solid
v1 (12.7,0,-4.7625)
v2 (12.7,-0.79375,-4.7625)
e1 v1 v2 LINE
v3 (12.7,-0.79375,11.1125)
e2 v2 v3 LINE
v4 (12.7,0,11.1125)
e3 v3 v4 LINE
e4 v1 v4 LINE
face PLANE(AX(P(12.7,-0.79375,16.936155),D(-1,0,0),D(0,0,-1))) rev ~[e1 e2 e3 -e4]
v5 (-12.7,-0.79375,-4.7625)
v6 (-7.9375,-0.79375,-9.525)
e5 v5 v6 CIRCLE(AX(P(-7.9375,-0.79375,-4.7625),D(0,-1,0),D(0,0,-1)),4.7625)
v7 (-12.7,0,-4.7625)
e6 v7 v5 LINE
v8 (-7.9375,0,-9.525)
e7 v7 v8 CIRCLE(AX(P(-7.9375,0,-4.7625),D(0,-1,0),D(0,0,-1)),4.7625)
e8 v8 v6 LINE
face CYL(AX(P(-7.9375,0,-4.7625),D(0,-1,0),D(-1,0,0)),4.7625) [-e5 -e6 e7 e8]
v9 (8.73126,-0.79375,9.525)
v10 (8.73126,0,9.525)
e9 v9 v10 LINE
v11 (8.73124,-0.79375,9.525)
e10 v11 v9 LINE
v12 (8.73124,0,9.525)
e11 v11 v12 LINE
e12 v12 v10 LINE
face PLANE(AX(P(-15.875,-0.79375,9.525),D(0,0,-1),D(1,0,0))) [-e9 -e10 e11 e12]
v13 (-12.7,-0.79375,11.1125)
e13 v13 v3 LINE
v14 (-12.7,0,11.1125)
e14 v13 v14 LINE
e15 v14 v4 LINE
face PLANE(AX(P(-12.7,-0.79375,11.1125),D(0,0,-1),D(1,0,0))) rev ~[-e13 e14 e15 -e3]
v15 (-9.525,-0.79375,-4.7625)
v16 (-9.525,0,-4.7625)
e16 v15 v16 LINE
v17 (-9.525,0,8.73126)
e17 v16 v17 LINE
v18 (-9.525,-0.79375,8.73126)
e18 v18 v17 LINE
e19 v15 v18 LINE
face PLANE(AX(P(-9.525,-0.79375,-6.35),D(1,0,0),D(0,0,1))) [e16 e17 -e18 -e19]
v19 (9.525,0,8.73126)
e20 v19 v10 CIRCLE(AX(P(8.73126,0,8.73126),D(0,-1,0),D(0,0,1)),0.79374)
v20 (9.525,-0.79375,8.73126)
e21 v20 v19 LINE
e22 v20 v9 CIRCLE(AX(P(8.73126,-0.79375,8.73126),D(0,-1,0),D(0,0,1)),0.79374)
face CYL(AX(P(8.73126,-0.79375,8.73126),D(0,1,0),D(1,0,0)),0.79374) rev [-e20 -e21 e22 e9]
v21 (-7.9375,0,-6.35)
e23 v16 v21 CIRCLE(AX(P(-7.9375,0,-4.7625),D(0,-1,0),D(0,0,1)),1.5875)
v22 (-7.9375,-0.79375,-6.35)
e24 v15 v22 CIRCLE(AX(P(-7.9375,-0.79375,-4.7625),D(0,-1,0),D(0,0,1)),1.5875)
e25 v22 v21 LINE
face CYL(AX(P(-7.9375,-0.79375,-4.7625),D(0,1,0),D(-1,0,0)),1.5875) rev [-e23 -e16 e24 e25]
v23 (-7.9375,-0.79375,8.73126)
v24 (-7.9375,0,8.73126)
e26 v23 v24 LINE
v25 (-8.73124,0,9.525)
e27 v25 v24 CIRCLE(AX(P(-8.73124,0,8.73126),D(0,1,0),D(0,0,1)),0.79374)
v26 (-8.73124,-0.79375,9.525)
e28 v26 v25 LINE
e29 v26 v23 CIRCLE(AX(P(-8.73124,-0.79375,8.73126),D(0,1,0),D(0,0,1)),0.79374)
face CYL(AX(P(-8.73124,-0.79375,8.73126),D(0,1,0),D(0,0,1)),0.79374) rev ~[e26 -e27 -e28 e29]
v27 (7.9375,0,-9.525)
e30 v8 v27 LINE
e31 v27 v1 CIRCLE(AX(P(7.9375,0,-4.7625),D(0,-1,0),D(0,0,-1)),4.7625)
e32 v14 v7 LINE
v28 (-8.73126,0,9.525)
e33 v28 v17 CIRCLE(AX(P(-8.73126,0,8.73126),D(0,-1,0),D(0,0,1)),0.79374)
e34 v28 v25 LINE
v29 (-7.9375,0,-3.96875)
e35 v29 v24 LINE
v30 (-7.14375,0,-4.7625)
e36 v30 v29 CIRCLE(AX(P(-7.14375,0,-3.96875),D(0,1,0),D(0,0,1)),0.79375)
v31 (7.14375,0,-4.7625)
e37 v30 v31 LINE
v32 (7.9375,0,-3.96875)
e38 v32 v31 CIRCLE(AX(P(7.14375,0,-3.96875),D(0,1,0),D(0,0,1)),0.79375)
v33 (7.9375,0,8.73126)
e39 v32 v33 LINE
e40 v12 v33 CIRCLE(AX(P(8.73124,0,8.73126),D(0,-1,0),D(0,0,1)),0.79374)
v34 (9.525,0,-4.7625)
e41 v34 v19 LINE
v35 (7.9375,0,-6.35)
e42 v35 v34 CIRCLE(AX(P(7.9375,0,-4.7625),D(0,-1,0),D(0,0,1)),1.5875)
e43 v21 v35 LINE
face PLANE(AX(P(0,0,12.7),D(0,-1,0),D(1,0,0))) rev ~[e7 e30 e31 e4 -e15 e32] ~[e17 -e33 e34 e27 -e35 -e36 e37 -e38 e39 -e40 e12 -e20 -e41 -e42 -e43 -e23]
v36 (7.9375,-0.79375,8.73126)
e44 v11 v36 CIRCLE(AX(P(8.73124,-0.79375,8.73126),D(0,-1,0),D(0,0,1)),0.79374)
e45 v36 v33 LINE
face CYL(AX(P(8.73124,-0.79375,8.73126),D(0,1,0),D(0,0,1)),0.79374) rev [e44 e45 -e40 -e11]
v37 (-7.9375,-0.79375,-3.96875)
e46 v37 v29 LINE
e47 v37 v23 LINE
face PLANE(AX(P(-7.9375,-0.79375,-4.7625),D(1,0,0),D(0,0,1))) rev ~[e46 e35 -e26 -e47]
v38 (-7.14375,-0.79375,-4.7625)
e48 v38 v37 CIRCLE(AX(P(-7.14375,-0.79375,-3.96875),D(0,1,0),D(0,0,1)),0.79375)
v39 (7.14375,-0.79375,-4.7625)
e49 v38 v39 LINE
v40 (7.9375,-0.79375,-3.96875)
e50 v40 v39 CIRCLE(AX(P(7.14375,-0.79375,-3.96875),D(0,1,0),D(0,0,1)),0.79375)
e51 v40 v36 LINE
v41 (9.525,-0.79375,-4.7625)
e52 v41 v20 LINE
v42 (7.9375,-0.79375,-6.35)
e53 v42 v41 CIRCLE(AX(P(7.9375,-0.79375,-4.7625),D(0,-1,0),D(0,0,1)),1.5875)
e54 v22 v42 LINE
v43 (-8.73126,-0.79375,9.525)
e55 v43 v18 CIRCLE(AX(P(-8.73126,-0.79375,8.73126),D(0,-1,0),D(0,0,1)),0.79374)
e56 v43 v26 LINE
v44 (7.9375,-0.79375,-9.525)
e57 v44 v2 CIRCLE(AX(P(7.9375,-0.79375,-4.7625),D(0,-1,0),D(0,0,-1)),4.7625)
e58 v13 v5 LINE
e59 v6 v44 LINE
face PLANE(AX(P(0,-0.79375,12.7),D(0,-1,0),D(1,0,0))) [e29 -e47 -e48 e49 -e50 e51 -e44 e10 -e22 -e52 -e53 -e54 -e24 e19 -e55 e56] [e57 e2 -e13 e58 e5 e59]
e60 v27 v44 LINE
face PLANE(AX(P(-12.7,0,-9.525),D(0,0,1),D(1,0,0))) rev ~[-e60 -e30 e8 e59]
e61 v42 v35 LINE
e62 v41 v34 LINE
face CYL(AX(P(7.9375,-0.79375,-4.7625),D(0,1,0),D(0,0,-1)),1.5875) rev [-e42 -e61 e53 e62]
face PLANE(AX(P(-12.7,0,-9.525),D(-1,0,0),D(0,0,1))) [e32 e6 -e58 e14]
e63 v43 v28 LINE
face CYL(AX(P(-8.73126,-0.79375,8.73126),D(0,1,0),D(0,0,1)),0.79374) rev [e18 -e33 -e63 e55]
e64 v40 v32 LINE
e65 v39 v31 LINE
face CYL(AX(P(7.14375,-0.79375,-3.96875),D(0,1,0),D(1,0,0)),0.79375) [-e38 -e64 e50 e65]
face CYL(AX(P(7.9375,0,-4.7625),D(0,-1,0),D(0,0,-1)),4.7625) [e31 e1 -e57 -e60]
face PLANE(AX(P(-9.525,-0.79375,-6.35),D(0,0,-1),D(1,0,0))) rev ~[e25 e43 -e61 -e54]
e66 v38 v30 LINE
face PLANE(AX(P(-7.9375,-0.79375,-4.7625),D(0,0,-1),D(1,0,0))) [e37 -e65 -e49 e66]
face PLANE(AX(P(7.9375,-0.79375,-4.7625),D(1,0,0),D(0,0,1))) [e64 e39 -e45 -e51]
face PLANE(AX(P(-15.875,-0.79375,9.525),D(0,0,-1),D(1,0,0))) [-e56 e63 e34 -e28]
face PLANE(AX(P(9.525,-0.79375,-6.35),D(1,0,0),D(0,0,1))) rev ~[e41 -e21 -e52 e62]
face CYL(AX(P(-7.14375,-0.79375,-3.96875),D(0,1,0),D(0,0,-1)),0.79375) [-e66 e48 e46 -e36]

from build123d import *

# Parameters (mm, degrees)
F0_W      = 25.4
F0_H      = 19.05
F1_DEPTH  = 0.79375
F2_R      = 4.7625
F3_W      = 19.05
F3_H      = 15.875
F4_DEPTH  = 4.9276
F6_DEPTH  = 0.79375
F7_R      = 1.5875
F9_W      = 15.875
F9_H      = 14.2875
F10_DEPTH = 0.79375
F11_R     = 0.79374
F12_R     = 0.79375
F14_DEPTH = 25.4
F15_W     = 25.4
F15_H     = 4.7625
F16_DEPTH = 25.4


# Not quite as in the source:
# - two fillets or chamfers of one size are made in one step
# - a fillet or chamfer is up to 0.001 mm smaller than in the source, because OpenCascade refuses the exact size


with BuildPart() as f1:
    # F0 (on Front) → F1 (new body)
    with BuildSketch(Plane.XZ):
        Rectangle(F0_W, F0_H)
    extrude(amount=F1_DEPTH)

    # F2
    f2_edges = [f1.edges().sort_by_distance(p)[0] for p in [
        (12.7, -0.396875, -9.525),
        (-12.7, -0.396875, -9.525),
    ]]
    fillet(f2_edges, radius=F2_R)

    # F3 (on face) → F4 (cut)
    with BuildSketch(Plane.XZ.offset(0.79375)):
        with Locations((0, 1.5875)):
            Rectangle(F3_W, F3_H)
    extrude(amount=-F4_DEPTH, mode=Mode.SUBTRACT)

    # F5 (on face) → F6 (join)
    with BuildSketch(Plane.XZ.offset(0.79375)):
        Polygon((-15.875, 15.875), (-15.875, 9.525), (-12.7, 9.525), (-9.525, 9.525), (9.525, 9.525), (12.7, 9.525), (15.875, 9.525), (15.875, 15.875), align=None)
    extrude(amount=-F6_DEPTH)

    # F7
    f7_edges = [f1.edges().sort_by_distance(p)[0] for p in [
        (-15.875, -0.396875, 15.875),
        (15.875, -0.396875, 15.875),
        (15.875, -0.396875, 9.525),
        (-15.875, -0.396875, 9.525),
        (-9.525, -0.396875, -6.35),
        (9.525, -0.396875, -6.35),
    ]]
    fillet(f7_edges, radius=F7_R)

    # F9 (on face) → F10 (join)
    with BuildSketch(Plane.XZ.offset(0.79375)):
        with BuildLine():
            ThreePointArc((-14.2875, 15.875), (-15.4100320151, 15.4100320151), (-15.875, 14.2875))
            Line((-15.875, 14.2875), (-15.875, 11.1125))
            ThreePointArc((-15.875, 11.1125), (-15.4100320151, 9.9899679849), (-14.2875, 9.525))
            Line((-14.2875, 9.525), (-12.7, 9.525))
            Line((-12.7, 9.525), (-12.7, -4.7625))
            ThreePointArc((-12.7, -4.7625), (-11.3050960454, -8.1300960454), (-7.9375, -9.525))
            Line((-7.9375, -9.525), (7.9375, -9.525))
            ThreePointArc((7.9375, -9.525), (11.3050960454, -8.1300960454), (12.7, -4.7625))
            Line((12.7, -4.7625), (12.7, 9.525))
            Line((12.7, 9.525), (14.2875, 9.525))
            ThreePointArc((14.2875, 9.525), (15.4100320151, 9.9899679849), (15.875, 11.1125))
            Line((15.875, 11.1125), (15.875, 14.2875))
            ThreePointArc((15.875, 14.2875), (15.4100320151, 15.4100320151), (14.2875, 15.875))
            Line((14.2875, 15.875), (-14.2875, 15.875))
        make_face()
        with BuildLine():
            Line((-9.525, 9.525), (-7.9375, 9.525))
            Line((-7.9375, 9.525), (7.9375, 9.525))
            Line((7.9375, 9.525), (9.525, 9.525))
            Line((9.525, 9.525), (9.525, -4.7625))
            ThreePointArc((9.525, -4.7625), (9.0600320151, -5.8850320151), (7.9375, -6.35))
            Line((7.9375, -6.35), (-7.9375, -6.35))
            ThreePointArc((-7.9375, -6.35), (-9.0600320151, -5.8850320151), (-9.525, -4.7625))
            Line((-9.525, -4.7625), (-9.525, 9.525))
        make_face(mode=Mode.SUBTRACT)
        with Locations((0, 2.38125)):
            Rectangle(F9_W, F9_H)
    extrude(amount=-F10_DEPTH)

    # F11 (radius 0.79375 in the source; OpenCascade refuses exactly that, so slightly less here)
    f11_edges = [f1.edges().sort_by_distance(p)[0] for p in [
        (-7.9375, -0.396875, 9.525),
        (-9.525, -0.396875, 9.525),
        (7.9375, -0.396875, 9.525),
        (9.525, -0.396875, 9.525),
    ]]
    fillet(f11_edges, radius=F11_R)

    # F12
    f12_edges = [f1.edges().sort_by_distance(p)[0] for p in [
        (-7.9375, -0.396875, -4.7625),
        (7.9375, -0.396875, -4.7625),
    ]]
    fillet(f12_edges, radius=F12_R)

    # F13 (on face) → F14 (cut)
    with BuildSketch(Plane.XZ.offset(0.79375)):
        with BuildLine():
            Line((-17.2636155039, 7.9375), (-12.7, 7.9375))
            Line((-12.7, 7.9375), (-12.7, 9.525))
            Line((-12.7, 9.525), (-14.2875, 9.525))
            ThreePointArc((-14.2875, 9.525), (-15.4100320151, 9.9899679849), (-15.875, 11.1125))
            Line((-15.875, 11.1125), (-15.875, 14.2875))
            ThreePointArc((-15.875, 14.2875), (-15.4100320151, 15.4100320151), (-14.2875, 15.875))
            Line((-14.2875, 15.875), (-12.7, 15.875))
            Line((-12.7, 15.875), (-12.7, 16.6596230119))
            Line((-12.7, 16.6596230119), (-17.2636155039, 16.6596230119))
            Line((-17.2636155039, 16.6596230119), (-17.2636155039, 7.9375))
        make_face()
        with BuildLine():
            Line((-14.2875, 9.525), (-12.7, 9.525))
            Line((-12.7, 9.525), (-12.7, 15.875))
            Line((-12.7, 15.875), (-14.2875, 15.875))
            ThreePointArc((-14.2875, 15.875), (-15.4100320151, 15.4100320151), (-15.875, 14.2875))
            Line((-15.875, 14.2875), (-15.875, 11.1125))
            ThreePointArc((-15.875, 11.1125), (-15.4100320151, 9.9899679849), (-14.2875, 9.525))
        make_face()
        with BuildLine():
            Line((14.2875, 15.875), (12.7, 15.875))
            Line((12.7, 15.875), (12.7, 9.525))
            Line((12.7, 9.525), (14.2875, 9.525))
            ThreePointArc((14.2875, 9.525), (15.4100320151, 9.9899679849), (15.875, 11.1125))
            Line((15.875, 11.1125), (15.875, 14.2875))
            ThreePointArc((15.875, 14.2875), (15.4100320151, 15.4100320151), (14.2875, 15.875))
        make_face()
        with BuildLine():
            Line((12.7, 16.9361550361), (12.7, 15.875))
            Line((12.7, 15.875), (14.2875, 15.875))
            ThreePointArc((14.2875, 15.875), (15.4100320151, 15.4100320151), (15.875, 14.2875))
            Line((15.875, 14.2875), (15.875, 11.1125))
            ThreePointArc((15.875, 11.1125), (15.4100320151, 9.9899679849), (14.2875, 9.525))
            Line((14.2875, 9.525), (12.7, 9.525))
            Line((12.7, 9.525), (12.7, 7.9375))
            Line((12.7, 7.9375), (16.7191289365, 7.9375))
            Line((16.7191289365, 7.9375), (16.7191289365, 16.9361550361))
            Line((16.7191289365, 16.9361550361), (12.7, 16.9361550361))
        make_face()
    extrude(amount=-F14_DEPTH, mode=Mode.SUBTRACT)

    # F15 (on face) → F16 (cut)
    with BuildSketch(Plane.XZ.offset(0.79375)):
        with Locations((0, 13.49375)):
            Rectangle(F15_W, F15_H)
    extrude(amount=-F16_DEPTH, mode=Mode.SUBTRACT)


solid = f1.part
